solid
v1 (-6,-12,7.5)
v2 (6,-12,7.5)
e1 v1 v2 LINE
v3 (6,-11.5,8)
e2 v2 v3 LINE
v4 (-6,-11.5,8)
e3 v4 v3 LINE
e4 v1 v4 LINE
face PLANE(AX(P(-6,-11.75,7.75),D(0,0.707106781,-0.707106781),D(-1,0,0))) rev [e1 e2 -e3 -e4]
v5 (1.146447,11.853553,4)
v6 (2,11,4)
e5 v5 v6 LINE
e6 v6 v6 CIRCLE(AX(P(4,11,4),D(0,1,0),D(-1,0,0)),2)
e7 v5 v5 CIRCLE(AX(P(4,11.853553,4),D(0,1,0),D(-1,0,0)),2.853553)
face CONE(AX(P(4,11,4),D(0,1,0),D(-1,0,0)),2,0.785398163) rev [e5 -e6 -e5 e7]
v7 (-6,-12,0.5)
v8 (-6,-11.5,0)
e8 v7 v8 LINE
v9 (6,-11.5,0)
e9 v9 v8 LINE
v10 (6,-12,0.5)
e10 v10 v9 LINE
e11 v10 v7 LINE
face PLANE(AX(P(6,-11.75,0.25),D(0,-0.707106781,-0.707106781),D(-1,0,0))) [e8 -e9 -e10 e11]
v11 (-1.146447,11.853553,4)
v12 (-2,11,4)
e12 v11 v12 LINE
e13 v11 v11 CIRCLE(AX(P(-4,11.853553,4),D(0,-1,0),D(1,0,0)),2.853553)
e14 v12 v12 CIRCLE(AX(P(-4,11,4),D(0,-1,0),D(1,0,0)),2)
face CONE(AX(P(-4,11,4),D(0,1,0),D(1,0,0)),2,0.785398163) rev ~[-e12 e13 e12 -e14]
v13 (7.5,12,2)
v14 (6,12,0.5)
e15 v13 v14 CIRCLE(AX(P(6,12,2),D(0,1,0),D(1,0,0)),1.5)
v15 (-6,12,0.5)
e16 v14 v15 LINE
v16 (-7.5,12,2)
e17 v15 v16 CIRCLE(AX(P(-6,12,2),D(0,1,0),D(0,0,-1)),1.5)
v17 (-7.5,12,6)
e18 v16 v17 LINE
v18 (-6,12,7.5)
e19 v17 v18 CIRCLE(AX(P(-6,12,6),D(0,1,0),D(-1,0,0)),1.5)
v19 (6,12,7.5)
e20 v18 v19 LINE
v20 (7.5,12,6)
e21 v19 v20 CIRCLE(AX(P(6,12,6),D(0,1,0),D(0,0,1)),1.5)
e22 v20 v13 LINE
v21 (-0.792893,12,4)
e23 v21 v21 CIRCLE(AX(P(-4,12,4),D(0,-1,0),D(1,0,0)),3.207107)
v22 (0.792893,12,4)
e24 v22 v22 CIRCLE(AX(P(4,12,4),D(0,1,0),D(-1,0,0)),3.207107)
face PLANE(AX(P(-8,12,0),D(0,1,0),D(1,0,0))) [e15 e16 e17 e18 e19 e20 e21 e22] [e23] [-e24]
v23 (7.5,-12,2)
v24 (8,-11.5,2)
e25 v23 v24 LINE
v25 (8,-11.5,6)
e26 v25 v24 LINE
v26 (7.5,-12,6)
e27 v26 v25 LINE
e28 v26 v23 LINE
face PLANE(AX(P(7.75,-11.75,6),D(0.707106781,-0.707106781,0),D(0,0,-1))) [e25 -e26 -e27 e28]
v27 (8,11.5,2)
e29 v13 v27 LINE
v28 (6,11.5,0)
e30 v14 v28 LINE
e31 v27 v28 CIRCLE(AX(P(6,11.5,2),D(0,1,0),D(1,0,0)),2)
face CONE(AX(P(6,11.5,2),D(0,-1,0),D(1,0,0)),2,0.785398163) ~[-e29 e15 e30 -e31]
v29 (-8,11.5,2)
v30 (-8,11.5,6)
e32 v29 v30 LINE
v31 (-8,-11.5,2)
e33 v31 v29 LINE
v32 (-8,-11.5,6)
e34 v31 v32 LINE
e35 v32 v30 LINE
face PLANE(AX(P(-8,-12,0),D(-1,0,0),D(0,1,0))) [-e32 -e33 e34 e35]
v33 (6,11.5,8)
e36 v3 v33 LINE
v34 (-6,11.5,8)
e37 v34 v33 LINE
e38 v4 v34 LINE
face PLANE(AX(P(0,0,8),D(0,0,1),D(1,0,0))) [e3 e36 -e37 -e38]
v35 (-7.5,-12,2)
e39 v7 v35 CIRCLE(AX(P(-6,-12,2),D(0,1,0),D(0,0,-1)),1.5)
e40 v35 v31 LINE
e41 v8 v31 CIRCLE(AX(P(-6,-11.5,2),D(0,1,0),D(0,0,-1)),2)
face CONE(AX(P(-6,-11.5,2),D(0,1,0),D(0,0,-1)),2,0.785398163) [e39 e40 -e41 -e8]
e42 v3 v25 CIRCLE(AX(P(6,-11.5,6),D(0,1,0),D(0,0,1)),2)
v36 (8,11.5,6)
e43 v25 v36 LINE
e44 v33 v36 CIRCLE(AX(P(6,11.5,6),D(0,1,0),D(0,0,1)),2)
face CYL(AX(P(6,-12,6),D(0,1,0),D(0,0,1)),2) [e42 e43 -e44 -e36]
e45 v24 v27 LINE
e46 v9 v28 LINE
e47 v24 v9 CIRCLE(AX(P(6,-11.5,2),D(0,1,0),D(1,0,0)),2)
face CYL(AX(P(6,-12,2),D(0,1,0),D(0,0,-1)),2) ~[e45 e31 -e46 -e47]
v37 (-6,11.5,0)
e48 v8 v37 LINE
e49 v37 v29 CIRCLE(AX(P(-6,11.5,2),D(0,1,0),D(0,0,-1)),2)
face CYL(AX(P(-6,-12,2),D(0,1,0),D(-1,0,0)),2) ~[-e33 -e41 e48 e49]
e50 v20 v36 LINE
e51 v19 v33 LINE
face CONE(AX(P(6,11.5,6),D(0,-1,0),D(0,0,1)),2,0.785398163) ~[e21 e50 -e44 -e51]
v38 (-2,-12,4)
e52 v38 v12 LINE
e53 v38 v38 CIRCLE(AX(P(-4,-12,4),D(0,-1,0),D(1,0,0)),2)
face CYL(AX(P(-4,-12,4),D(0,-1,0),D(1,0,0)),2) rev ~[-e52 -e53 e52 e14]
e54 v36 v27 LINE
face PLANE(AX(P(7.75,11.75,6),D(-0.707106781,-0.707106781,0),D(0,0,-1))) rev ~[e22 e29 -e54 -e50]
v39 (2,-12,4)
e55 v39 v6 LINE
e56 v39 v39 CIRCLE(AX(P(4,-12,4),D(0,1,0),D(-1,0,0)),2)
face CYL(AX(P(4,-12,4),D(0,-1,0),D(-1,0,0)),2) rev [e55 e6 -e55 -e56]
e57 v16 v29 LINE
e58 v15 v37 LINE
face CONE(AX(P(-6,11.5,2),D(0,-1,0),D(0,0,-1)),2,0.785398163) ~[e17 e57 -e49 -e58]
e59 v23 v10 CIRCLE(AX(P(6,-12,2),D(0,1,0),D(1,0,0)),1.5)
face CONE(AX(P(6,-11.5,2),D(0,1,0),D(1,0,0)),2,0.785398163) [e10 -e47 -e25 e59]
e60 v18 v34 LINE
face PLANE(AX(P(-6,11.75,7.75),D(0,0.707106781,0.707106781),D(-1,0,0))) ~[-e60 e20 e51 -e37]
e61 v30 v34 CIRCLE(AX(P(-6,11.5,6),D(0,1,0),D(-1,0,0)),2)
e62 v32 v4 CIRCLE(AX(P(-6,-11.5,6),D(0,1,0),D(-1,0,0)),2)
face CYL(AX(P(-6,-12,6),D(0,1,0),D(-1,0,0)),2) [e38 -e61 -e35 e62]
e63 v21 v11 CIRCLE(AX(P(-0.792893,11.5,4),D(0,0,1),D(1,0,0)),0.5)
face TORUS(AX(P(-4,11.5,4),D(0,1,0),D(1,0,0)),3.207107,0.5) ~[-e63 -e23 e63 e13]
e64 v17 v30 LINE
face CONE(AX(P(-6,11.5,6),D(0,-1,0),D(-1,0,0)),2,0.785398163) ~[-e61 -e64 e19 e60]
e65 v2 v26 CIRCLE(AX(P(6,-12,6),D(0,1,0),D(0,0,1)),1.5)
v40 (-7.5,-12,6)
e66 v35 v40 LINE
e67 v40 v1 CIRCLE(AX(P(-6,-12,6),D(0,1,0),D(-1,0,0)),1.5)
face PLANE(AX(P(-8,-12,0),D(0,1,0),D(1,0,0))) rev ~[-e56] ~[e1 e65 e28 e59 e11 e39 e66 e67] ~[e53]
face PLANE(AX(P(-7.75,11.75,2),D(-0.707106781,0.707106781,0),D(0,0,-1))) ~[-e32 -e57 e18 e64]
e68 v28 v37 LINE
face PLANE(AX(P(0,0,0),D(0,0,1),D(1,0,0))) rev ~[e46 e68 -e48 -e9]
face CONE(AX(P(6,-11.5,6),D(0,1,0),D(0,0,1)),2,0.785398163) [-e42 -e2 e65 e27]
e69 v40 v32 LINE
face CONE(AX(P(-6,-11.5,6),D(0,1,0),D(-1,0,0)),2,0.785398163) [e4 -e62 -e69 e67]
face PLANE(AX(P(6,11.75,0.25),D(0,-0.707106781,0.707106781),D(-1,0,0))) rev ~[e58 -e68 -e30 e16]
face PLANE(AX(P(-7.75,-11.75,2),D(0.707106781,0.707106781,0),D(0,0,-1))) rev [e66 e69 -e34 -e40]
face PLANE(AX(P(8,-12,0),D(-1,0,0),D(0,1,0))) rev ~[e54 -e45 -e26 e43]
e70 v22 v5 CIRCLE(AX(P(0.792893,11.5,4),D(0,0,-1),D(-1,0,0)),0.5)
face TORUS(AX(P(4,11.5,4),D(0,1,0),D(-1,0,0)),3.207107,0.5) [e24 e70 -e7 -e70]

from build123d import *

# Parameters (mm, degrees)
F0_W     = 16
F0_H     = 24
F1_DEPTH = 8
F2_R     = 2
F3_DEPTH = 50
F5_R     = 2
F6_SIZE  = 0.5
F7_SIZE  = 1
F8_R     = 0.5


with BuildPart() as f1:
    # F0 (on Top) → F1 (new body)
    with BuildSketch(Plane.XY):
        Rectangle(F0_W, F0_H)
    extrude(amount=F1_DEPTH)

    # F2 (on face) → F3 (cut)
    with BuildSketch(Plane.XZ.offset(12)):
        with Locations((-4, 4)):
            Circle(F2_R)
    extrude(amount=-F3_DEPTH, mode=Mode.SUBTRACT)

    # F4: F1 across plane


with BuildPart() as f1_1:
    add(f1.part)
    add(f1.part.mirror(Plane.YZ), mode=Mode.INTERSECT)

    # F5
    f5_edges = [f1_1.edges().sort_by_distance(p)[0] for p in [
        (-8, 0, 8),
        (8, 0, 8),
        (8, 0, 0),
        (-8, 0, 0),
    ]]
    fillet(f5_edges, radius=F5_R)

    # F6
    f6_edges = [f1_1.edges().sort_by_distance(p)[0] for p in [
        (0, -12, 8),
        (0, 12, 8),
        (8, 12, 4),
        (7.414214, 12, 0.585786),
        (7.414214, 12, 7.414214),
        (0, 12, 0),
        (-7.414214, 12, 0.585786),
        (-7.414214, 12, 7.414214),
        (-8, 12, 4),
        (8, -12, 4),
        (7.414214, -12, 0.585786),
        (7.414214, -12, 7.414214),
        (0, -12, 0),
        (-7.414214, -12, 0.585786),
        (-7.414214, -12, 7.414214),
        (-8, -12, 4),
    ]]
    chamfer(f6_edges, length=F6_SIZE)

    # F7
    f7_edges = [f1_1.edges().sort_by_distance(p)[0] for p in [
        (6, 12, 4),
        (-6, 12, 4),
    ]]
    chamfer(f7_edges, length=F7_SIZE)

    # F8
    f8_edges = [f1_1.edges().sort_by_distance(p)[0] for p in [
        (-7, 12, 4),
        (7, 12, 4),
    ]]
    fillet(f8_edges, radius=F8_R)


solid = f1_1.part
